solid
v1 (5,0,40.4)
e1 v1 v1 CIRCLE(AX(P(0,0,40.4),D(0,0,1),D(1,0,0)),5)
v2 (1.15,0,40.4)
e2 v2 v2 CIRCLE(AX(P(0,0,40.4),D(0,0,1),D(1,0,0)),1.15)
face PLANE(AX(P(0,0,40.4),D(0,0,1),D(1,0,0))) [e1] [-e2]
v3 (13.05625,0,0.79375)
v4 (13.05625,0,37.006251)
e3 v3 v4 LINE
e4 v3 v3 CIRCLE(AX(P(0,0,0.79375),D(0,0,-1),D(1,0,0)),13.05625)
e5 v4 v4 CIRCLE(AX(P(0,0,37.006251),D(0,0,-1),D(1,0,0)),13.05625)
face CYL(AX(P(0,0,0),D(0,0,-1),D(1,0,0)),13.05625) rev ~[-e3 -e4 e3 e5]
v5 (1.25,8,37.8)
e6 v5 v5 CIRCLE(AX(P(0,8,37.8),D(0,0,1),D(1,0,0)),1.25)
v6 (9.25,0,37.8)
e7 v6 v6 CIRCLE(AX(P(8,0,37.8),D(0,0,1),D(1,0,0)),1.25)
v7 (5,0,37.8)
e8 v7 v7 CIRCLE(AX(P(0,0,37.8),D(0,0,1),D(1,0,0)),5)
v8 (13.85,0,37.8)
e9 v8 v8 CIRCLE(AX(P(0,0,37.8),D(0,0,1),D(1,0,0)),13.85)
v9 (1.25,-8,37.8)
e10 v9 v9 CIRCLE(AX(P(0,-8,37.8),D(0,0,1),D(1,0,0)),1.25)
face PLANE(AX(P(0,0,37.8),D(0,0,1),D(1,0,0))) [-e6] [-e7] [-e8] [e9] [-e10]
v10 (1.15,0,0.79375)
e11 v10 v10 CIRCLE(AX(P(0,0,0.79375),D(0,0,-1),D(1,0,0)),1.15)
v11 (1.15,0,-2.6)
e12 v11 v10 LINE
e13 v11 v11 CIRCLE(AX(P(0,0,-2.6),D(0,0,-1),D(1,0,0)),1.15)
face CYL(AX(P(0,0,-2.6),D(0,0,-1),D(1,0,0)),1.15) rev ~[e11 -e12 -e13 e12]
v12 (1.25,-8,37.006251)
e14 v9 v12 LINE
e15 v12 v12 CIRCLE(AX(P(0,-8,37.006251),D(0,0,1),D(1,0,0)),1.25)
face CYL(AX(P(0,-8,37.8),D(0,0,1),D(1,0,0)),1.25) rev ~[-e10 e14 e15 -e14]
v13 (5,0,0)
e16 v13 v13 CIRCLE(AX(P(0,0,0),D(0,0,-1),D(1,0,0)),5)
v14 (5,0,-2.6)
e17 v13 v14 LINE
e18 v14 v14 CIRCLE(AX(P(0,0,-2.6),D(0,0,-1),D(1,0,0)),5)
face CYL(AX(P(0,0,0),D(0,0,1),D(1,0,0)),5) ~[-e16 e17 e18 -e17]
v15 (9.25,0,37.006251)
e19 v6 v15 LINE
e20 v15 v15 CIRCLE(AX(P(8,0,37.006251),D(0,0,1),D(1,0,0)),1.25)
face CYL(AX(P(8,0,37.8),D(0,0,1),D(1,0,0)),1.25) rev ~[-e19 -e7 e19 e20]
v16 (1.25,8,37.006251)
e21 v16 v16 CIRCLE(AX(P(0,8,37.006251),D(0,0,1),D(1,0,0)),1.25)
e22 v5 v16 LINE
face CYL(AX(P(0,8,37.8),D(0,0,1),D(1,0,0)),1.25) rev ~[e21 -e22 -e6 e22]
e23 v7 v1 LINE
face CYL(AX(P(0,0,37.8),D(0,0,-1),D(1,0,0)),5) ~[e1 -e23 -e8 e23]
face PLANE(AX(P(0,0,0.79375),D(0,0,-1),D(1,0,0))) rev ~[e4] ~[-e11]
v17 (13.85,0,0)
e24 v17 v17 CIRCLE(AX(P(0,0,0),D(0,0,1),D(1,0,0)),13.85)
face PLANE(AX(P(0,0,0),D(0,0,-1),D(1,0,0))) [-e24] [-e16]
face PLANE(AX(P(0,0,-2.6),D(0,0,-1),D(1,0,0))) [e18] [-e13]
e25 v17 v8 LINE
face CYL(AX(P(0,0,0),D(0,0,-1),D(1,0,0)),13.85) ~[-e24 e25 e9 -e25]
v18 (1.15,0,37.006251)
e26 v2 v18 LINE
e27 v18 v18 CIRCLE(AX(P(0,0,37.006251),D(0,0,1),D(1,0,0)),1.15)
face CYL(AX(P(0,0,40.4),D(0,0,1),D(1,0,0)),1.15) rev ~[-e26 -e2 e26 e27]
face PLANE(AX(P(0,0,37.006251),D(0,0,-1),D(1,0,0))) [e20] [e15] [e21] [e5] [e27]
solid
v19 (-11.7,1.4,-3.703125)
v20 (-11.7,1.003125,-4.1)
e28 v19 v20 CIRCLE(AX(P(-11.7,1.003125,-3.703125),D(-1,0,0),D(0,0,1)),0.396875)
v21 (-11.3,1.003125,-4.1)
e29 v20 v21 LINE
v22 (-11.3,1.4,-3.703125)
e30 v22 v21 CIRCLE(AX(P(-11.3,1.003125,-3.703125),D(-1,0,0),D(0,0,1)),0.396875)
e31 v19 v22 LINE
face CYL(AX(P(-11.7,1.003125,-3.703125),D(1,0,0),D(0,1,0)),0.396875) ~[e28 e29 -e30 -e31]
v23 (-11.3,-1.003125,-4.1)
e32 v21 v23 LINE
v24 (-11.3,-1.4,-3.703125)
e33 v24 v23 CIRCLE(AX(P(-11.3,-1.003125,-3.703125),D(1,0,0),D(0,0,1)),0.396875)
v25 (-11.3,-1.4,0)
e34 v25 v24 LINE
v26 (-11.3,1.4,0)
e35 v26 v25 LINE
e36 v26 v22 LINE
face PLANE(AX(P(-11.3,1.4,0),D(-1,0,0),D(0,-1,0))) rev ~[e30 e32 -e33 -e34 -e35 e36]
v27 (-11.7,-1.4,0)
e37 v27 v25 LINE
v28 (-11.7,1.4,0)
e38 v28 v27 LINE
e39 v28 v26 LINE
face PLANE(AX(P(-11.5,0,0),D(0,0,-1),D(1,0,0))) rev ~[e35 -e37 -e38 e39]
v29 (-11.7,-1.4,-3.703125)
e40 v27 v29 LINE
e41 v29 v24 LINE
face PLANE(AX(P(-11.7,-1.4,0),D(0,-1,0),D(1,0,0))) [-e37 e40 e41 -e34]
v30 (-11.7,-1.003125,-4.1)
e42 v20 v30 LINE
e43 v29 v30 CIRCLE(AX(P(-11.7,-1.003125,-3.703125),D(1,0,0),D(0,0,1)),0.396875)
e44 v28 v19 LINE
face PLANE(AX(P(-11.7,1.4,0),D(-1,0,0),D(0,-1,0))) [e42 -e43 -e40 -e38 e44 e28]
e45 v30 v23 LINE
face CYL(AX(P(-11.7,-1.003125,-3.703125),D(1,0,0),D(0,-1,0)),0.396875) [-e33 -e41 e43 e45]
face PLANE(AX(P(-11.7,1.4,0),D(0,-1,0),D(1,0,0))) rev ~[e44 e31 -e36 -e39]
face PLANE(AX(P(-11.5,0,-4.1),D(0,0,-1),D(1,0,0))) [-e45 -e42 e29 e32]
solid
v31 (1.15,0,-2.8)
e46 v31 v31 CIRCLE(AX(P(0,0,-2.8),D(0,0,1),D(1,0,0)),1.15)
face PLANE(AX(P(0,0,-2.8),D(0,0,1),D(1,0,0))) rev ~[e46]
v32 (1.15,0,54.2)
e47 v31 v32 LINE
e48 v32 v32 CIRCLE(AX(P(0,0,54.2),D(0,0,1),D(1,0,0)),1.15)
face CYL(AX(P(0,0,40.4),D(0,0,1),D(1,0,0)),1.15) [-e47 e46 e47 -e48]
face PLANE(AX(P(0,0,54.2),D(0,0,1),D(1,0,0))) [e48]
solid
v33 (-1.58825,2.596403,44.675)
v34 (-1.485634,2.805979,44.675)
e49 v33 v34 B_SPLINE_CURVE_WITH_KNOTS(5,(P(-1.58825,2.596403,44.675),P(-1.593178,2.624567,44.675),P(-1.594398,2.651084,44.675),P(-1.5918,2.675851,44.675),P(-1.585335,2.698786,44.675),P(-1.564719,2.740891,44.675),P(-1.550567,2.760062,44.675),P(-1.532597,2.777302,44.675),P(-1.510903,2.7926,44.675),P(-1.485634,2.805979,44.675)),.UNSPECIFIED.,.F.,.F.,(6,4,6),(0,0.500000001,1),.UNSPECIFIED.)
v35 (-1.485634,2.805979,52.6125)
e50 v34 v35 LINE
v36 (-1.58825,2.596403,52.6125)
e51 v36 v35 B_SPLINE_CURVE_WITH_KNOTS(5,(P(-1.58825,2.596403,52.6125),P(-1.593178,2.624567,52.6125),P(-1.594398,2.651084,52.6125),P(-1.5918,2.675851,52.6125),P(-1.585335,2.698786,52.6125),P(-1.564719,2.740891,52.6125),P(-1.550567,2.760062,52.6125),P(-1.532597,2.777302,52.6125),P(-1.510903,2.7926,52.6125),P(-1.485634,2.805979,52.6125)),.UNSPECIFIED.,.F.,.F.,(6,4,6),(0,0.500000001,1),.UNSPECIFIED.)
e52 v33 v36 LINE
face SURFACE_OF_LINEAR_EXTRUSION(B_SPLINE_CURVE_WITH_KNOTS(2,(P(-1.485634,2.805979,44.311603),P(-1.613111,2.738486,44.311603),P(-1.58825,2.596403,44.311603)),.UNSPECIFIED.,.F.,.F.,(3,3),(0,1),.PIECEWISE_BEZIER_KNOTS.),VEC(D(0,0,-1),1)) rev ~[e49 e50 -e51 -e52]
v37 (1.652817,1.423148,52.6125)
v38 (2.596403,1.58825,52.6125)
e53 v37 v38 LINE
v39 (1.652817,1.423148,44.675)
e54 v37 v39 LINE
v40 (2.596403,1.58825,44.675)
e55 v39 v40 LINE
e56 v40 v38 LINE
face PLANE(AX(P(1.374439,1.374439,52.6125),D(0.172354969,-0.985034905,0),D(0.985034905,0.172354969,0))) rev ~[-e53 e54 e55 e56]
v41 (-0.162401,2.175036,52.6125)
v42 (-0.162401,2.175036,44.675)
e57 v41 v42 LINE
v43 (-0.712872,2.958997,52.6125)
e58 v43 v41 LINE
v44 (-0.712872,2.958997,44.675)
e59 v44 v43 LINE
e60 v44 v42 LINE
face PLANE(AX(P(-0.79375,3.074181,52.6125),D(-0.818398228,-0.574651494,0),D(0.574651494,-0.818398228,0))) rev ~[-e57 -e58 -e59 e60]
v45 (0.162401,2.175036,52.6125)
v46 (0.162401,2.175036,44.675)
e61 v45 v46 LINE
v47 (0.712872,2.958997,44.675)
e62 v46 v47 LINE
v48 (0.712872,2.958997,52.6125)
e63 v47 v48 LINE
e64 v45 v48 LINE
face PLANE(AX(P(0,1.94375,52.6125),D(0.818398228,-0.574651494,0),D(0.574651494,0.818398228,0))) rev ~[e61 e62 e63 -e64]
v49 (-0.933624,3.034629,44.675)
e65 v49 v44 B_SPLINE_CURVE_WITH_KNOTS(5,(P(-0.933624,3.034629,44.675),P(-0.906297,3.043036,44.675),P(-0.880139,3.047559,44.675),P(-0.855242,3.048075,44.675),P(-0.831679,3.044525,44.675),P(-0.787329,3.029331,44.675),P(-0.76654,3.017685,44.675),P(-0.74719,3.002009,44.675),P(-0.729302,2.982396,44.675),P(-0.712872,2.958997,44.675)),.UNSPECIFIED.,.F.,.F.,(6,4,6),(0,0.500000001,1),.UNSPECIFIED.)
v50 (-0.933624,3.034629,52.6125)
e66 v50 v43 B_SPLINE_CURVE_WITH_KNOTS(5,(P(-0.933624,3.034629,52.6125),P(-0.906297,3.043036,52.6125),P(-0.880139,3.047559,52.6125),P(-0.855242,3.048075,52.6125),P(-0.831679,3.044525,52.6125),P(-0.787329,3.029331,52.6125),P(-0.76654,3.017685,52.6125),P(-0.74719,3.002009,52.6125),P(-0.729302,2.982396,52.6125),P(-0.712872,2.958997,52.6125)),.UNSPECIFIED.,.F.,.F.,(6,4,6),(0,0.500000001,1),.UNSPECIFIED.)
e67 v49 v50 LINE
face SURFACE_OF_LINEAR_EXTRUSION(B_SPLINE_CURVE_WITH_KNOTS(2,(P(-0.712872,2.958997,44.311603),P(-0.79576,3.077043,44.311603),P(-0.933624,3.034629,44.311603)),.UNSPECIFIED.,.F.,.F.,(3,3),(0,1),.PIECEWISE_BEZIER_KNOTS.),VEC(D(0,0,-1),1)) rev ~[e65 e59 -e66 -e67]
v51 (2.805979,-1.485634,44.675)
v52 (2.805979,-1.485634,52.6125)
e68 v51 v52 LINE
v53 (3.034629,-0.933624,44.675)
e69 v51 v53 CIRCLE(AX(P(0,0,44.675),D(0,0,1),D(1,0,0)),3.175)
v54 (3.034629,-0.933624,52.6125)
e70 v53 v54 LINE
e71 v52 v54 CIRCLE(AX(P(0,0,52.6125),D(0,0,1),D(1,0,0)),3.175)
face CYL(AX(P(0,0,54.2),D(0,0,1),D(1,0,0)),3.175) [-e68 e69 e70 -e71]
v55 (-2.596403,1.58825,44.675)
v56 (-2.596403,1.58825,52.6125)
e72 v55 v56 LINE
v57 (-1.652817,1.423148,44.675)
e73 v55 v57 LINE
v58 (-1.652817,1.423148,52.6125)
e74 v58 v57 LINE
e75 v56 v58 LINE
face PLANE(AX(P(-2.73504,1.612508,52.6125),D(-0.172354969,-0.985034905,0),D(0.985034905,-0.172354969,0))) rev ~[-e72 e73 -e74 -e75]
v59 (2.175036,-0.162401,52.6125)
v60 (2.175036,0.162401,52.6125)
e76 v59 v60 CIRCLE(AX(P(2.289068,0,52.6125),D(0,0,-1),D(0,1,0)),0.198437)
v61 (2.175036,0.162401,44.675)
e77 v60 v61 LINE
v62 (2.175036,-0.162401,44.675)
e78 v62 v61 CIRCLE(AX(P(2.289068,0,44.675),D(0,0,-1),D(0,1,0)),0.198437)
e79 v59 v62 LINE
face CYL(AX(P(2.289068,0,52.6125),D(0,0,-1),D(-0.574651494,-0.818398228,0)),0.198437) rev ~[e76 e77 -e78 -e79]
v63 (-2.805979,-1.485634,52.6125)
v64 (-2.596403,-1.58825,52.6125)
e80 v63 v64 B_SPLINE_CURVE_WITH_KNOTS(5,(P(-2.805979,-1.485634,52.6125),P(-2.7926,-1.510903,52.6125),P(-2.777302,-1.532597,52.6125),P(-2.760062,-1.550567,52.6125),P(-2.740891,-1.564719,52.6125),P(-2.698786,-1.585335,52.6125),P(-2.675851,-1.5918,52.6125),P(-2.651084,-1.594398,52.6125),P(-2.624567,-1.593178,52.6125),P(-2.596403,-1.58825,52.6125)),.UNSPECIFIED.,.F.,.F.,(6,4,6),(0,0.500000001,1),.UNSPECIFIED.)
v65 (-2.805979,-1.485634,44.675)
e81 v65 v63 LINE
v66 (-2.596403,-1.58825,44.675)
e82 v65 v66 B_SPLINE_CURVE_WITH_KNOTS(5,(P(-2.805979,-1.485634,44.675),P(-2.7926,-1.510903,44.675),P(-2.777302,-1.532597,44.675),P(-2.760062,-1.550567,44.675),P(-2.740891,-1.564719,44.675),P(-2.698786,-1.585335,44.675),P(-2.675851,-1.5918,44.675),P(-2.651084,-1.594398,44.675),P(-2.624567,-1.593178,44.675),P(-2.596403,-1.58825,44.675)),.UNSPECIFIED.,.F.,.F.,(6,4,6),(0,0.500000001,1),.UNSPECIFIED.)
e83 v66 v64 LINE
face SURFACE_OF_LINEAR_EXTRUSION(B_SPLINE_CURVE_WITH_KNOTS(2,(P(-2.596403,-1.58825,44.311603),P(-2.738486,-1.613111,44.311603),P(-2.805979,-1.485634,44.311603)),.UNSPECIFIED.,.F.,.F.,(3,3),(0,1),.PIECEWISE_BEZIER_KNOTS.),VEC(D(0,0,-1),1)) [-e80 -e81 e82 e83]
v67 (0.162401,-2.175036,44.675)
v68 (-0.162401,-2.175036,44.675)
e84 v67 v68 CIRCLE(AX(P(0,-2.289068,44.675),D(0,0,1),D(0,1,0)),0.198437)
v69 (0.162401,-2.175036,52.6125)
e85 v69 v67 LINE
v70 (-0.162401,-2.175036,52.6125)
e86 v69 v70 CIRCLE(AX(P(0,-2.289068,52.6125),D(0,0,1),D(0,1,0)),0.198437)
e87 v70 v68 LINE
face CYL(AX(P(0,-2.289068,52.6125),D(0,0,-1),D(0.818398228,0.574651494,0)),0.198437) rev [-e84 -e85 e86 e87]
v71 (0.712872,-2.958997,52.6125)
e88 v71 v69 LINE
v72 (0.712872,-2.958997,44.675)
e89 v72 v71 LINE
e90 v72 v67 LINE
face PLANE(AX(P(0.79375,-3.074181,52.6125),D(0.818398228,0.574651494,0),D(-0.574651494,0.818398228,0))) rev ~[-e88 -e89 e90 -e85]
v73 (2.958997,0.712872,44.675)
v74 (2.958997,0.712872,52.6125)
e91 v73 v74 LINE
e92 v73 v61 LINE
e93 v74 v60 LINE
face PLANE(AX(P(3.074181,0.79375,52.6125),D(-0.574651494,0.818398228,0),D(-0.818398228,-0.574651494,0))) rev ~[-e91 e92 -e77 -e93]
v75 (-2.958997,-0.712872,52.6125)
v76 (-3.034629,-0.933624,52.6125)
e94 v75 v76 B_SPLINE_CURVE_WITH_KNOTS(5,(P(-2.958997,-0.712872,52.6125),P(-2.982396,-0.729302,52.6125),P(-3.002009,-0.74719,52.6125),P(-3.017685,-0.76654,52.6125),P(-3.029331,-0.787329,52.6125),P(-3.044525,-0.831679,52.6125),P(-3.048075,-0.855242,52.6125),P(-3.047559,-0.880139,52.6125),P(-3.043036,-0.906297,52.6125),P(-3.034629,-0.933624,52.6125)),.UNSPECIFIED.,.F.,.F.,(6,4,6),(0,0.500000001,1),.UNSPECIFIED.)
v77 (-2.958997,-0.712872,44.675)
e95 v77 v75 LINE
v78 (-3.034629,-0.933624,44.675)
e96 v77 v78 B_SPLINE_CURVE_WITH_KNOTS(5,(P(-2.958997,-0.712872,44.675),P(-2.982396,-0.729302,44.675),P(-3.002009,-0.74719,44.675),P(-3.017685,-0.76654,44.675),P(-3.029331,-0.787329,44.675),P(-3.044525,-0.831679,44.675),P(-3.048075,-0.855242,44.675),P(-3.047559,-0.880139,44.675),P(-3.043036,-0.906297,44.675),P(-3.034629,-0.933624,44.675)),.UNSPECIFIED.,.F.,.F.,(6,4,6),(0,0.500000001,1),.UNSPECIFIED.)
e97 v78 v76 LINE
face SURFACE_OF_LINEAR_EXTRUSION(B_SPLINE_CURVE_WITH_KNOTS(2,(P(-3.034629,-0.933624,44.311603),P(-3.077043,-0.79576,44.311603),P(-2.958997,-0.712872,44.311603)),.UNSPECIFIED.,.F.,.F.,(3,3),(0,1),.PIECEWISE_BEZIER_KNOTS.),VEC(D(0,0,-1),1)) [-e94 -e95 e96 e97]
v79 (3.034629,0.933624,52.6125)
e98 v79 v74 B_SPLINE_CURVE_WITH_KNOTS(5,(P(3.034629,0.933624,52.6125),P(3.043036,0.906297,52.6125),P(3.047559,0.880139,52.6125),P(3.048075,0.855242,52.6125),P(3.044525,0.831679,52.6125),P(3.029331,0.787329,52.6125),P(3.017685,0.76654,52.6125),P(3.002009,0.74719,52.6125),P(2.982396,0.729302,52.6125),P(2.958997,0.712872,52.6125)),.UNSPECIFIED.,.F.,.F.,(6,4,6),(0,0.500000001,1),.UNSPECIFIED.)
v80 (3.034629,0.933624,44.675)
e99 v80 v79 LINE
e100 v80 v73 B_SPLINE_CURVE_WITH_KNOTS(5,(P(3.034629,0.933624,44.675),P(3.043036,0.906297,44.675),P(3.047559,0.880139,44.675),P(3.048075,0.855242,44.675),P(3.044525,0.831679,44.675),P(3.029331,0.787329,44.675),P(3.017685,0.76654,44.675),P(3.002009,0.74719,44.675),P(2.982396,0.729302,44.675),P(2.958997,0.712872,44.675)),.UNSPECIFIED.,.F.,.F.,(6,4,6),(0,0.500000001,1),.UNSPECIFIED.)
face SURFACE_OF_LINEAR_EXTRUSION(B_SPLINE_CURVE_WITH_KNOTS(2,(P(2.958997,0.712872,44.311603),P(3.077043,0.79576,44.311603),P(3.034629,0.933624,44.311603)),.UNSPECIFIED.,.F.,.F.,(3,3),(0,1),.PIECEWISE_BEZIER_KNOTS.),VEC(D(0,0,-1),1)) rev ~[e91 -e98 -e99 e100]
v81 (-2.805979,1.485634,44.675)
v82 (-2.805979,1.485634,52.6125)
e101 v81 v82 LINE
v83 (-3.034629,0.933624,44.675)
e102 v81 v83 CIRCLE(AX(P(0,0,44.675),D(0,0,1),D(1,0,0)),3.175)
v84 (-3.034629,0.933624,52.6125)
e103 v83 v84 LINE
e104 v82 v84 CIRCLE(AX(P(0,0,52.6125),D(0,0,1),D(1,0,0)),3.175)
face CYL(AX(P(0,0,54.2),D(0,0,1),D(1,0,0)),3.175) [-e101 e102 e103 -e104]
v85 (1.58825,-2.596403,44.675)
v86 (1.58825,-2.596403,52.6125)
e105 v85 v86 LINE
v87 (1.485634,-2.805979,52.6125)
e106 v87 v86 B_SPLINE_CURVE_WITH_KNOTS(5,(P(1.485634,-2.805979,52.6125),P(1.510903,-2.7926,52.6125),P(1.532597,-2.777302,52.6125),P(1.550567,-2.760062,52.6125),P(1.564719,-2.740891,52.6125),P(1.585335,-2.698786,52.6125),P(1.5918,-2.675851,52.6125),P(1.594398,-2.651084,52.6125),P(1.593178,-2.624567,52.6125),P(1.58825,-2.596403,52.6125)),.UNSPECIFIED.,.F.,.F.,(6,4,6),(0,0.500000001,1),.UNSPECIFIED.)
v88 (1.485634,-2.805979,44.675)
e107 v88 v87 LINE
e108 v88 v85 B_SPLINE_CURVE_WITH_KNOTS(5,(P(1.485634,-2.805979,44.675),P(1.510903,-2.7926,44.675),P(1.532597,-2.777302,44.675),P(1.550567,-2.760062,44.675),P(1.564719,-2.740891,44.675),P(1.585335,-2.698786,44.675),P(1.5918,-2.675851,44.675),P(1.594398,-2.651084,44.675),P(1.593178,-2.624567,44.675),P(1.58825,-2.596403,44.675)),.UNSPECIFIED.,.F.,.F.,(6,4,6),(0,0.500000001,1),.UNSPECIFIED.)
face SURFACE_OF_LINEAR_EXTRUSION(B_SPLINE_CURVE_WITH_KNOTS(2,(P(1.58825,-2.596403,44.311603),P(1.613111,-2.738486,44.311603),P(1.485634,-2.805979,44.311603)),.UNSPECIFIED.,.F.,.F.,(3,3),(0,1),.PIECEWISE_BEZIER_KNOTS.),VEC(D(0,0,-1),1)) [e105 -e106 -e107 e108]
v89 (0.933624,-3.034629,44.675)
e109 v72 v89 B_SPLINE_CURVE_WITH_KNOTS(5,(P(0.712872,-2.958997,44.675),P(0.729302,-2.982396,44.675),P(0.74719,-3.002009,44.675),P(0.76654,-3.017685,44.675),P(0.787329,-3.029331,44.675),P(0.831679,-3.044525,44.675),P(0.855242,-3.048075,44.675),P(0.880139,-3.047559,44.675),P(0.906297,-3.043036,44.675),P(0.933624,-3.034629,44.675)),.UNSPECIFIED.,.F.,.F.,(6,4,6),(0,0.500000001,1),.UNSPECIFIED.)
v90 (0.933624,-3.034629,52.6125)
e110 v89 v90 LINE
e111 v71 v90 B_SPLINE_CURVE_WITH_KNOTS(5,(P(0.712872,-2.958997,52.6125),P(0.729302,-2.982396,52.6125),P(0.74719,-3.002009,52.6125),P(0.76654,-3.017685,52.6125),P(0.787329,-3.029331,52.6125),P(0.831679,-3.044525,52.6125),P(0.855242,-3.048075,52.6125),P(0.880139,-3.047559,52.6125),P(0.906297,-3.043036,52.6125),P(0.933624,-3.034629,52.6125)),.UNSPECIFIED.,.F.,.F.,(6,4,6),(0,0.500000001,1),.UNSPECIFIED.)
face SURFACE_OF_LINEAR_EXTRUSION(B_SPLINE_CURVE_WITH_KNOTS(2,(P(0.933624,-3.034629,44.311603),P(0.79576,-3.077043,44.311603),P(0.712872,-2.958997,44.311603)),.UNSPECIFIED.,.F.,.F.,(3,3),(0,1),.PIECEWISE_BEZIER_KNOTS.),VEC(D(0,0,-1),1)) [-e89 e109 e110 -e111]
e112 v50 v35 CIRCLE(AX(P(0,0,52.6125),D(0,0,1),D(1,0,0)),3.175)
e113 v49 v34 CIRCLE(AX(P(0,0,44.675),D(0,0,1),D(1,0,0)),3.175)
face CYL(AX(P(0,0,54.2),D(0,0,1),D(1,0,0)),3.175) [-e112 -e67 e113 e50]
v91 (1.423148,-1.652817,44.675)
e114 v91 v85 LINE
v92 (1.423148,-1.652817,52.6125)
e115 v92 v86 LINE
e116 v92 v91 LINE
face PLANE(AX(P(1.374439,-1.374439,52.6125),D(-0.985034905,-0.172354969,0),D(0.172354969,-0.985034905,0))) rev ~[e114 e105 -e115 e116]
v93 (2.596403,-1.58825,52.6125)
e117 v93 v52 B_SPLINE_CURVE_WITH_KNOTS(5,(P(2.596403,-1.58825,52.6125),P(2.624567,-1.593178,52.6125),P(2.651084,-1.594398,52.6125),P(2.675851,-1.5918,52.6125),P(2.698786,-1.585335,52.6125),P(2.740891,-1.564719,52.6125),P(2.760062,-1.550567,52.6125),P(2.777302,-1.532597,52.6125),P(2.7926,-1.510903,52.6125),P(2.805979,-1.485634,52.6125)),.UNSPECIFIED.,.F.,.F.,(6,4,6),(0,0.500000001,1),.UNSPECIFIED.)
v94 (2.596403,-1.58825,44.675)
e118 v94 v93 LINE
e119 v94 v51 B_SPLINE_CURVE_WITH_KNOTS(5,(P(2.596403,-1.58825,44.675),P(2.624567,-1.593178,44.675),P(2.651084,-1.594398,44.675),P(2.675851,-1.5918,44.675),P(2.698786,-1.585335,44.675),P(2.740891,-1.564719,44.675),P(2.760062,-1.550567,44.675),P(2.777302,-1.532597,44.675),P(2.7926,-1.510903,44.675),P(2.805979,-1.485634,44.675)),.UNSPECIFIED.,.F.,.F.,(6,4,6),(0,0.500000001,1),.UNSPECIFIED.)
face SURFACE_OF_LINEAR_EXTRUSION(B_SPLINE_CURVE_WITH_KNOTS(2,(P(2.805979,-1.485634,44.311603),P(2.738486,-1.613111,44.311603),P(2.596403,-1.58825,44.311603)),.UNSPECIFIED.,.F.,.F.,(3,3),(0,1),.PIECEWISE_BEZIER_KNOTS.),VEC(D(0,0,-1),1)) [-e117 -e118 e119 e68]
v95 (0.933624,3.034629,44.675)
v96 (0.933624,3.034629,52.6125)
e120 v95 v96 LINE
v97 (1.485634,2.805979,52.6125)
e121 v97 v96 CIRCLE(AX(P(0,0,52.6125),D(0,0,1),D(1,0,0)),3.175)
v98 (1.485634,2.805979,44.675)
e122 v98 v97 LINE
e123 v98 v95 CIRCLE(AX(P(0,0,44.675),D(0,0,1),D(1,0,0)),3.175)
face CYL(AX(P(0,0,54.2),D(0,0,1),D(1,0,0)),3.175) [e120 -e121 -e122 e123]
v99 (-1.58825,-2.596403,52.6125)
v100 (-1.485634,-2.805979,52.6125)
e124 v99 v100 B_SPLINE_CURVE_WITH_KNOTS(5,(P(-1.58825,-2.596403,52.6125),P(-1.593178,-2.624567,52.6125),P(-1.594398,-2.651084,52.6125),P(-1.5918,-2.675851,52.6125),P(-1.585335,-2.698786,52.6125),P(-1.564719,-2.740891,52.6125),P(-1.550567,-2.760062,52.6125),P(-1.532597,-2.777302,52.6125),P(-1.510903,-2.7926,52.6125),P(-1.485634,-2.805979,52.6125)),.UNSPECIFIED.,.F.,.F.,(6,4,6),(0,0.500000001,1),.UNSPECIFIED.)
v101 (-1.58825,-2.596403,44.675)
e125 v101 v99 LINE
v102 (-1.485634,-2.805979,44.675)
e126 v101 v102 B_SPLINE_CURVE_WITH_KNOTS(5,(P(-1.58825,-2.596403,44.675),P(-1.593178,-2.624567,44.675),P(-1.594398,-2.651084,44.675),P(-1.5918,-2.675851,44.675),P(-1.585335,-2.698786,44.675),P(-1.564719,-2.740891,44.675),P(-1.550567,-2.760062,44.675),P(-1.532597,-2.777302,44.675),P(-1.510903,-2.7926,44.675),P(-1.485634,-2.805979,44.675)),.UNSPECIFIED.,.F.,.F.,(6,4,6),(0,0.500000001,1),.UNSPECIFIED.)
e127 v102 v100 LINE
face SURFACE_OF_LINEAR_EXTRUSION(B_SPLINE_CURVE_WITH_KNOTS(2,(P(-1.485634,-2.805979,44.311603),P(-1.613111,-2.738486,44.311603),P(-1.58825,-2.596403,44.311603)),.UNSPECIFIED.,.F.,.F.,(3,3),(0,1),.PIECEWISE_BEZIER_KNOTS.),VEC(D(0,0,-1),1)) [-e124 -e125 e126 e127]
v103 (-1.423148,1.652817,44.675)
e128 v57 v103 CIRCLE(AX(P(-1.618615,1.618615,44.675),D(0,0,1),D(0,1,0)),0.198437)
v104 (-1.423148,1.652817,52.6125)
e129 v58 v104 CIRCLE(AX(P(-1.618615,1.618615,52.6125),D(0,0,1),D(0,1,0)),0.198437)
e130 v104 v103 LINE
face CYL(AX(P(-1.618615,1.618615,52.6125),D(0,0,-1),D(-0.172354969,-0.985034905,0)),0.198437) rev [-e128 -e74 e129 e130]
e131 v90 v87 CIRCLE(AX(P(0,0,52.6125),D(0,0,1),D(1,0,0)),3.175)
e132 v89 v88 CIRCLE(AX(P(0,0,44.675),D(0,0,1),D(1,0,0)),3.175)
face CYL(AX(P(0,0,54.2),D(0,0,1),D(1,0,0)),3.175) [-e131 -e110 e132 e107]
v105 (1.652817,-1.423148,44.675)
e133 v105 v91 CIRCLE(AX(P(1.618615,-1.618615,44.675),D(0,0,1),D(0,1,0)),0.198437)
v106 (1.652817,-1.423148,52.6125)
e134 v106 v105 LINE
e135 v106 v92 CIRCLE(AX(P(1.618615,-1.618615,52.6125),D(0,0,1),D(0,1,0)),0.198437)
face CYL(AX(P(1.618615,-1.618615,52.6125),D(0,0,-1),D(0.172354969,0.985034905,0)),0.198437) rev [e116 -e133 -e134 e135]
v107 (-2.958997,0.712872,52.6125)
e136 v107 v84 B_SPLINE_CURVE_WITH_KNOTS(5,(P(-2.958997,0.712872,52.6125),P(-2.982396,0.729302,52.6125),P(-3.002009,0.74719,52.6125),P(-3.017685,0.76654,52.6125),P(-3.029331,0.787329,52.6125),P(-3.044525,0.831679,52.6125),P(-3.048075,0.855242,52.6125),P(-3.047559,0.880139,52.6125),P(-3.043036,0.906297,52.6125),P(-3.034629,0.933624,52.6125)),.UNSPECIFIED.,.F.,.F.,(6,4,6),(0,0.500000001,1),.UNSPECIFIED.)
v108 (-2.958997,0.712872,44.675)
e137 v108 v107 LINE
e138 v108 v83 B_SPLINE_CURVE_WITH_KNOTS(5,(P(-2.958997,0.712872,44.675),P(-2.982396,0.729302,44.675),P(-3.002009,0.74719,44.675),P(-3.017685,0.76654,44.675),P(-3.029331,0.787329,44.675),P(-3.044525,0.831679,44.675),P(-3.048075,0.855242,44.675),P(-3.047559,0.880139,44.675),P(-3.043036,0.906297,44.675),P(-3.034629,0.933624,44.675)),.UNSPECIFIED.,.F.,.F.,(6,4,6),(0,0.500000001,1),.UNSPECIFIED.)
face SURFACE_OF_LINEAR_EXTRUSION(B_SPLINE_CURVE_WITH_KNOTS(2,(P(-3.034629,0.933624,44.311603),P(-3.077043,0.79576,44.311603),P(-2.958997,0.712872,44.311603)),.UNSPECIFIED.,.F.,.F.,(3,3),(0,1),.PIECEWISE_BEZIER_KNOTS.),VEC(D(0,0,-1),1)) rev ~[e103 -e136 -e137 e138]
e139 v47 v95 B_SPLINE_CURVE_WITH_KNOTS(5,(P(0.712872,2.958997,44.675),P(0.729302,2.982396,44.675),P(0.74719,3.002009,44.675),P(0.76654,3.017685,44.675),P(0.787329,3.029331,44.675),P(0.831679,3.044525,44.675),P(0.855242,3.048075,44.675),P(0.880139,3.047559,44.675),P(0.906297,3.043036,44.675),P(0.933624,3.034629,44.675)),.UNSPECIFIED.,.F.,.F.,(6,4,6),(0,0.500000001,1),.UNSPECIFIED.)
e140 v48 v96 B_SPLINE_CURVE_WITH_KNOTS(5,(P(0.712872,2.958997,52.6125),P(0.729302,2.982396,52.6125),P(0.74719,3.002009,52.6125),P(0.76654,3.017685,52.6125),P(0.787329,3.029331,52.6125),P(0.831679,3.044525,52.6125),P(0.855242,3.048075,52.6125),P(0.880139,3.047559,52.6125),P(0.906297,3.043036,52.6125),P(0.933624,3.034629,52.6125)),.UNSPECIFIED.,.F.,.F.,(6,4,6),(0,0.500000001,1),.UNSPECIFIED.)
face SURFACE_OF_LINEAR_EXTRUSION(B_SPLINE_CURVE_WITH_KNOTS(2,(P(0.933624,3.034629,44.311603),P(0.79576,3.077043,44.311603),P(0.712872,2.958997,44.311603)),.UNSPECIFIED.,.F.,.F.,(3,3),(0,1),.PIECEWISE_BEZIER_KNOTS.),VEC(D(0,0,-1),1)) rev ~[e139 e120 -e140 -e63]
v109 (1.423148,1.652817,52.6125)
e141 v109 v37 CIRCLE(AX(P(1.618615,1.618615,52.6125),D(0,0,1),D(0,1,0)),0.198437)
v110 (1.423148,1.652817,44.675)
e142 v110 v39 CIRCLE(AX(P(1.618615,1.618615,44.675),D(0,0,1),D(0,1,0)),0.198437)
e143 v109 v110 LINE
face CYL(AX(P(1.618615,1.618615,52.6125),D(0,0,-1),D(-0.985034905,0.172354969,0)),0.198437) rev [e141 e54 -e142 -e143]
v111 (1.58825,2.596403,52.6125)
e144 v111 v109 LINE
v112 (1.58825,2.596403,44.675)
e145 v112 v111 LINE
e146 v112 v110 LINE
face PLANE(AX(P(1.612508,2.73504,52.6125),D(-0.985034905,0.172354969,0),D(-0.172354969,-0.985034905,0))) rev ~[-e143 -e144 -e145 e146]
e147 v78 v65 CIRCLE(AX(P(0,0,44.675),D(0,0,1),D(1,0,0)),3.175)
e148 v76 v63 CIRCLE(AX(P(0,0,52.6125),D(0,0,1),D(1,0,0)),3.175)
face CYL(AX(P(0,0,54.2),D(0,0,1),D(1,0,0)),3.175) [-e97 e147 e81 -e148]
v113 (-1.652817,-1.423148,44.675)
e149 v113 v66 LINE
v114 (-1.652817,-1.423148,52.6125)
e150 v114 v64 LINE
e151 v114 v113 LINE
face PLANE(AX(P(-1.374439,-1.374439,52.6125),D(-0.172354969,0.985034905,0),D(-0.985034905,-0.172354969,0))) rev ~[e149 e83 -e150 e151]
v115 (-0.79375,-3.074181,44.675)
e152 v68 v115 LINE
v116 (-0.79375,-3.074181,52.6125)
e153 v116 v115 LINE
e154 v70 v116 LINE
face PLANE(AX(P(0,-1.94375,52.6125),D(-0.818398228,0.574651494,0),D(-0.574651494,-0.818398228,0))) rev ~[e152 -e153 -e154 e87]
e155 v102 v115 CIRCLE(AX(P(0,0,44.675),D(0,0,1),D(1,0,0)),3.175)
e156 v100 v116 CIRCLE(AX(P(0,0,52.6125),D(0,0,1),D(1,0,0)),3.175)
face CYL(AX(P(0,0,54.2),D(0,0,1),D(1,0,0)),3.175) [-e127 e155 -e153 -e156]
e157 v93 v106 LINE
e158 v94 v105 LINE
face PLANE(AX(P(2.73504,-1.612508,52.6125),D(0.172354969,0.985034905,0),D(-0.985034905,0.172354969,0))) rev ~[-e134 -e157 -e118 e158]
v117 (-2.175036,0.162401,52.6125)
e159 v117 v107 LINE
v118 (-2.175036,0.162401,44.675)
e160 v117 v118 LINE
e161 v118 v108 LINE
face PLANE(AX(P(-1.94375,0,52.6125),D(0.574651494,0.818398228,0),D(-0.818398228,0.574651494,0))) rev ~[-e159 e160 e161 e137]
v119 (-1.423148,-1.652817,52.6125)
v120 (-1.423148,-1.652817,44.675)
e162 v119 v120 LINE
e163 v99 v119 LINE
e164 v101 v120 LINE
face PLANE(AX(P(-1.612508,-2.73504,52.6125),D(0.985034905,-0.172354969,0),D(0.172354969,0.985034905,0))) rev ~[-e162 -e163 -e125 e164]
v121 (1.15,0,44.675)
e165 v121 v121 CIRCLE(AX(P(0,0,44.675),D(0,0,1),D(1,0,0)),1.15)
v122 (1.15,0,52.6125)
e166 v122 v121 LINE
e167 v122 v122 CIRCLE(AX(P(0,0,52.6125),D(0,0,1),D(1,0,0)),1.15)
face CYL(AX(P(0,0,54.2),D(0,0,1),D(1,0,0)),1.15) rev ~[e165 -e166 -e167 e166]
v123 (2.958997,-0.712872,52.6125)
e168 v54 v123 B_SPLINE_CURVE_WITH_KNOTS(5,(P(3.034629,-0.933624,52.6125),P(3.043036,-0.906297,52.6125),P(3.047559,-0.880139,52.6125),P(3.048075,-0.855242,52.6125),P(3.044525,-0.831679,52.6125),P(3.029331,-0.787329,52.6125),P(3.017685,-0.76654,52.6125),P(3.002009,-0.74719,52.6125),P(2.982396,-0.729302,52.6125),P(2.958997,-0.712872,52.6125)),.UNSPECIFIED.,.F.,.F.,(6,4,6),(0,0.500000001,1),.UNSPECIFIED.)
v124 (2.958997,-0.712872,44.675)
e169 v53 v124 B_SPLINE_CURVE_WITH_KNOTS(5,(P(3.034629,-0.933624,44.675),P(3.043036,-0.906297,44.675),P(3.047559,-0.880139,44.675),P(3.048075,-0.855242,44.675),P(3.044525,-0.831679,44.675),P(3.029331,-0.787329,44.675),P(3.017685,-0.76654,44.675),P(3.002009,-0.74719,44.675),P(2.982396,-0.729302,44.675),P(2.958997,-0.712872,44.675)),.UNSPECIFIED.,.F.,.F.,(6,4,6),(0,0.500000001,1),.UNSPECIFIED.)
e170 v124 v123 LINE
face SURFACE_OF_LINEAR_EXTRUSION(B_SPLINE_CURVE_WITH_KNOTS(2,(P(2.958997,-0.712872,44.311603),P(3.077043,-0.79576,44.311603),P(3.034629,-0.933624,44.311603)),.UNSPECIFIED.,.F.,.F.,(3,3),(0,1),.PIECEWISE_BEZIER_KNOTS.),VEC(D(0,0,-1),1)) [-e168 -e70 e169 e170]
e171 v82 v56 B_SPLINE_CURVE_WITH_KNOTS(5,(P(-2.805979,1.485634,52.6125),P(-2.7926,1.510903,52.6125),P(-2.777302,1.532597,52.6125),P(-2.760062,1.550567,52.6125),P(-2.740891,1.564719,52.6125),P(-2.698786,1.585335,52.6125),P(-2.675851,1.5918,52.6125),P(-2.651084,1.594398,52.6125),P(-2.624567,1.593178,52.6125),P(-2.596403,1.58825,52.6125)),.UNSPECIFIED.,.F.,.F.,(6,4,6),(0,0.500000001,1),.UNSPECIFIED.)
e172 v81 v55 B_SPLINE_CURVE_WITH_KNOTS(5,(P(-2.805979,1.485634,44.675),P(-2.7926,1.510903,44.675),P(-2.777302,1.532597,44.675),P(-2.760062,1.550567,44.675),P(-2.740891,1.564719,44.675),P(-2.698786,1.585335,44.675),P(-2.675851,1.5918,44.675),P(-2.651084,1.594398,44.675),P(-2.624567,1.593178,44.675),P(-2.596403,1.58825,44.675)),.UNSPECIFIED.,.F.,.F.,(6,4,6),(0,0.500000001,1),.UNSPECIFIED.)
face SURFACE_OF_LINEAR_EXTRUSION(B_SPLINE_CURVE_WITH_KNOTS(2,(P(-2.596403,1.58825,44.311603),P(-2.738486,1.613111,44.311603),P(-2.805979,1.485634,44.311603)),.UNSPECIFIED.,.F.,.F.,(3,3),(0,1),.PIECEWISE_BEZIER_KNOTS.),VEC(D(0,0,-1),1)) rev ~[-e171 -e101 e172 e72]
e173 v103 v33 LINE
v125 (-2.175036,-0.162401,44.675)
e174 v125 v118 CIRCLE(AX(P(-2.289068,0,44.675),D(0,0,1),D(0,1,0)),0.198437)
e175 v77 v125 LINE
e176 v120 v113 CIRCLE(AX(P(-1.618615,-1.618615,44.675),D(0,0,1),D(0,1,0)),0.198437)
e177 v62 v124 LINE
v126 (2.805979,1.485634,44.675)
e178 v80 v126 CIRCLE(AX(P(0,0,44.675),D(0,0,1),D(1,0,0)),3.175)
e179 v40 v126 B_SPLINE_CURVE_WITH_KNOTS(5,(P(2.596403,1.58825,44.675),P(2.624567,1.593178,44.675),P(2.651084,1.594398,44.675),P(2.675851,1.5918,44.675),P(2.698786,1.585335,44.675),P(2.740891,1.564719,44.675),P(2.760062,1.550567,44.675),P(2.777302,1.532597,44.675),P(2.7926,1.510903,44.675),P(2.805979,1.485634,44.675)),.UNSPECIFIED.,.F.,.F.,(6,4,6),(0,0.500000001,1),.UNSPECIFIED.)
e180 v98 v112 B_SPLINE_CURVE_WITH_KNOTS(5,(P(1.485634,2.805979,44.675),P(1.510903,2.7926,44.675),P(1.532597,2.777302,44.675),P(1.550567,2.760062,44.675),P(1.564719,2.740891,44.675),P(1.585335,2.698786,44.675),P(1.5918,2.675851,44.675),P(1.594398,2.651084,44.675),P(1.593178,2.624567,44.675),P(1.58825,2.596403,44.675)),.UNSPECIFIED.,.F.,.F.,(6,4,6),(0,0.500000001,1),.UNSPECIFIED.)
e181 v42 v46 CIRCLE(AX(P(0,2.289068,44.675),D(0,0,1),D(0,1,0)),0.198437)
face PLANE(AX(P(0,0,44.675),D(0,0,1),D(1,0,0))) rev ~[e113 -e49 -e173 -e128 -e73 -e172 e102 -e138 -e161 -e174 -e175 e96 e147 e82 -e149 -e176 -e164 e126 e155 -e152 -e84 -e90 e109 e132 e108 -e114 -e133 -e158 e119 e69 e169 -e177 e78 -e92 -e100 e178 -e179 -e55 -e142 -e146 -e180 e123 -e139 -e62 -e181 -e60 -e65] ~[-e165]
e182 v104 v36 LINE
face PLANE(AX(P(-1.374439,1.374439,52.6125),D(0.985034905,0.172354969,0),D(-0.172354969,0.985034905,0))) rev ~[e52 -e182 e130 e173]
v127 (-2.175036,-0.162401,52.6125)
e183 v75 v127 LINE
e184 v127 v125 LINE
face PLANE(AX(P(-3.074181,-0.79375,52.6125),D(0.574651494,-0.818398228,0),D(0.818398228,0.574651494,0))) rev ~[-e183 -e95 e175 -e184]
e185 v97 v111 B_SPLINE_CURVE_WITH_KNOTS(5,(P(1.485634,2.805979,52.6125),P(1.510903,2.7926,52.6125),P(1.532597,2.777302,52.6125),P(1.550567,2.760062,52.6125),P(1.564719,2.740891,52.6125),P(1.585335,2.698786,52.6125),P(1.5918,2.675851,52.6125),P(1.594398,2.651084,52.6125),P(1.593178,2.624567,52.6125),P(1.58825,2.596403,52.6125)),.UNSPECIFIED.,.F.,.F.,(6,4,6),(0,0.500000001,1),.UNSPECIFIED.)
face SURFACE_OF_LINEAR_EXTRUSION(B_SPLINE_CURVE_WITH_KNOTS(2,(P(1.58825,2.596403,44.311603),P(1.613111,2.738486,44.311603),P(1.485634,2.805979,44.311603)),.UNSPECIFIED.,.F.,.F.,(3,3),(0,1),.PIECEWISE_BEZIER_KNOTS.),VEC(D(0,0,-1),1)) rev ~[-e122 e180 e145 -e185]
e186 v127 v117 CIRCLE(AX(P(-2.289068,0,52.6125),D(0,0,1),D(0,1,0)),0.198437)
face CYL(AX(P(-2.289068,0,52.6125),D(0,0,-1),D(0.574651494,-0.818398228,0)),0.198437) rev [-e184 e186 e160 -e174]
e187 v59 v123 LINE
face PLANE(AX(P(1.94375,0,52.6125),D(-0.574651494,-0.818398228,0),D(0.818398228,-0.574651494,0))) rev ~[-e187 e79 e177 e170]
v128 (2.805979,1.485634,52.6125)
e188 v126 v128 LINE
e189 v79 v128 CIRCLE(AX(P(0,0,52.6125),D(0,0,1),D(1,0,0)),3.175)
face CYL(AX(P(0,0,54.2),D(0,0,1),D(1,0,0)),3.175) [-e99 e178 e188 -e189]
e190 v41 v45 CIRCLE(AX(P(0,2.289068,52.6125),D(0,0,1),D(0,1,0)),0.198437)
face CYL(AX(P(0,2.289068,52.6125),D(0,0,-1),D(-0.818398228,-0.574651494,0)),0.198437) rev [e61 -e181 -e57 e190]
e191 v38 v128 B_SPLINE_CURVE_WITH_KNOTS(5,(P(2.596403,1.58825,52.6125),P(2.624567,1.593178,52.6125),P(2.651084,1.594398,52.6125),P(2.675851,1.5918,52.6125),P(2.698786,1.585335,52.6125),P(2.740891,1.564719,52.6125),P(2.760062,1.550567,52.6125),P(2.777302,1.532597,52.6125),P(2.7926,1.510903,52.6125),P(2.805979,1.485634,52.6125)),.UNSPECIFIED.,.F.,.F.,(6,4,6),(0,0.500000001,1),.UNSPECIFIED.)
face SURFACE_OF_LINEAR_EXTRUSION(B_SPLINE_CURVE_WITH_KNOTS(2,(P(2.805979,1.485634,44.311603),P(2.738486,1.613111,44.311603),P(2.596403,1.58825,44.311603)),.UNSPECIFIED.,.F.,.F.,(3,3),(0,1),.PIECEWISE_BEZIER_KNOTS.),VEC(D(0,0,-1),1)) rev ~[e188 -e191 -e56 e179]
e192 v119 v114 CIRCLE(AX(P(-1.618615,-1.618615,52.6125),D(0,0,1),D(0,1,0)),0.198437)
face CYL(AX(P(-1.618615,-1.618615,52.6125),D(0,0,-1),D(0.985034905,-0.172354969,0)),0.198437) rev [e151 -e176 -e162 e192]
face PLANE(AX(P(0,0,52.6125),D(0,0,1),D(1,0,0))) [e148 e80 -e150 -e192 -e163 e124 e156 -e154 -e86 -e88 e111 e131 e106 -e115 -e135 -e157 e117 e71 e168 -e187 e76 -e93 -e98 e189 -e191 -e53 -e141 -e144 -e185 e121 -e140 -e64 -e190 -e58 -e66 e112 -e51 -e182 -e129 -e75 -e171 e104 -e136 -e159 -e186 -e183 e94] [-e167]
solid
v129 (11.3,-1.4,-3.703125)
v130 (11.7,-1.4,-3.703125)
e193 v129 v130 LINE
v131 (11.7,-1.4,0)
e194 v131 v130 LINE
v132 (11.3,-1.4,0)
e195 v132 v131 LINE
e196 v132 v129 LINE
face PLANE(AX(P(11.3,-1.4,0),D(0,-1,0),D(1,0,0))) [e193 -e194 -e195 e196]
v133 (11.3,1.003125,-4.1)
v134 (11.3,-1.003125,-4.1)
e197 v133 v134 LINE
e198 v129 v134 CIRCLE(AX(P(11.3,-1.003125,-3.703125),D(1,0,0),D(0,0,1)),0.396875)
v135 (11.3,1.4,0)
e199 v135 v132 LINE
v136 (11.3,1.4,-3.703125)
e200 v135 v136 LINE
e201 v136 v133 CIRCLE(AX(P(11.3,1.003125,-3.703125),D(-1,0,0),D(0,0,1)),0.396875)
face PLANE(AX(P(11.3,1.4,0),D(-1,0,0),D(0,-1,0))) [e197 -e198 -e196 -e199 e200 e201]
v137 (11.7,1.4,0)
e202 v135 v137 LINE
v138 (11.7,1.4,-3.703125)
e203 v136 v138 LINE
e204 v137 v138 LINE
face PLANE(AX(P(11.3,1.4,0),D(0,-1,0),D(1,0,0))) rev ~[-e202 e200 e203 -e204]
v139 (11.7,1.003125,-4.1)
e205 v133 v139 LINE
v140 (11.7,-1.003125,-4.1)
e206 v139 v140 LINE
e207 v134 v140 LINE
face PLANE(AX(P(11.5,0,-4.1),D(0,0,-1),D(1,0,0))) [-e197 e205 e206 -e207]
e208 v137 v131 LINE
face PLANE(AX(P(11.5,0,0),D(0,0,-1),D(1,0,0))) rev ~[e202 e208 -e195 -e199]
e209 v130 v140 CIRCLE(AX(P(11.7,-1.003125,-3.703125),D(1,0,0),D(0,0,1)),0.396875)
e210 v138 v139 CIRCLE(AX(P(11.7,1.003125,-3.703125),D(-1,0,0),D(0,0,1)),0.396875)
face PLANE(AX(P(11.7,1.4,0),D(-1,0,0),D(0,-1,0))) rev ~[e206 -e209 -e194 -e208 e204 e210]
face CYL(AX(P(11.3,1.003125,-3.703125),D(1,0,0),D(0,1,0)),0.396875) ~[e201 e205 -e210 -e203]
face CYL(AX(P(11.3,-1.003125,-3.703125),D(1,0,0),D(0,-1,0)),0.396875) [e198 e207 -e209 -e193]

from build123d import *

# Parameters (mm, degrees)
F0_R         = 13.85
F1_DEPTH     = 37.8
F2_R         = 5
F3_DEPTH     = 2.6
F4_R         = 1.25
F5_DEPTH     = 0.79375
F6_R         = 13.05625
F7_DEPTH     = 37.0062506
F8_R         = 1.15
F9_DEPTH     = 50.8
F11_R        = 13.05625
F12_DEPTH    = 0.79375
F13_R        = 5
F14_DEPTH    = 2.6
F15_R        = 1.15
F16_DEPTH    = 25.4
F10_R        = 1.15
F17_DEPTH    = 13.8
F18_DEPTH    = 43.2
F19_W        = 0.4
F19_H        = 2.8
F20_DEPTH    = 4.1
F21_R        = 0.396875
F21_2_R      = 0.396875
F22_R        = 3.175
F22_R_2      = 1.15
F23_DEPTH    = 9.525
F24_DEPTH    = 1.5875
F26_DEPTH    = 25.4
F27_R        = 0.1984375
F28_T1_DEPTH = 8.6642936454


# Not quite as in the source:
# - a fillet or chamfer that OpenCascade refuses, or shapes differently, is made with other operations: its cross-section is extruded or revolved along the edge and cut away or added


with BuildPart() as f1:
    # F0 (on Top) → F1 (new body)
    with BuildSketch(Plane.XY):
        Circle(F0_R)
    extrude(amount=F1_DEPTH)

    # F2 (on face) → F3 (join)
    with BuildSketch(Plane.XY.offset(37.8)):
        Circle(F2_R)
    extrude(amount=F3_DEPTH)

    # F4 (on face) → F5 (cut)
    with BuildSketch(Plane.XY.offset(37.8)):
        with Locations((0, 8)):
            Circle(F4_R)
        with Locations((8, 0)):
            Circle(F4_R)
        with Locations((0, -8)):
            Circle(F4_R)
    extrude(amount=-F5_DEPTH, mode=Mode.SUBTRACT)

    # F6 (on face) → F7 (cut)
    with BuildSketch(Plane(origin=(0, 0, 0), x_dir=(1, 0, 0), z_dir=(0, 0, -1))):
        Circle(F6_R)
    extrude(amount=-F7_DEPTH, mode=Mode.SUBTRACT)

    # F8 (on face) → F9 (cut)
    with BuildSketch(Plane.XY.offset(40.4)):
        Circle(F8_R)
    extrude(amount=-F9_DEPTH, mode=Mode.SUBTRACT)

    # F11 (on face) → F12 (join)
    with BuildSketch(Plane(origin=(0, 0, 0), x_dir=(1, 0, 0), z_dir=(0, 0, -1))):
        Circle(F11_R)
    extrude(amount=-F12_DEPTH)

    # F13 (on face) → F14 (join)
    with BuildSketch(Plane(origin=(0, 0, 0), x_dir=(1, 0, 0), z_dir=(0, 0, -1))):
        Circle(F13_R)
    extrude(amount=F14_DEPTH)

    # F15 (on face) → F16 (cut)
    with BuildSketch(Plane(origin=(0, 0, -2.6), x_dir=(1, 0, 0), z_dir=(0, 0, -1))):
        Circle(F15_R)
    extrude(amount=-F16_DEPTH, mode=Mode.SUBTRACT)


with BuildPart() as f17:
    # F10 (on face) → F17 (new body)
    with BuildSketch(Plane.XY.offset(40.4)):
        Circle(F10_R)
    extrude(amount=F17_DEPTH)

    # F18 (add): a face of the model
    f18_faces = [f17.faces().sort_by_distance(p)[0] for p in [
        (0, 0, 40.4),
    ]]
    extrude(f18_faces, amount=F18_DEPTH)


with BuildPart() as f20:
    # F19 (on face) → F20 (new body)
    with BuildSketch(Plane(origin=(0, 0, 0), x_dir=(1, 0, 0), z_dir=(0, 0, -1))):
        with Locations((-11.5, 0)):
            Rectangle(F19_W, F19_H)
    extrude(amount=F20_DEPTH)

    # F21
    f21_edges = [f20.edges().sort_by_distance(p)[0] for p in [
        (-11.5, 1.4, -4.1),
        (-11.5, -1.4, -4.1),
    ]]
    fillet(f21_edges, radius=F21_R)


with BuildPart() as f20b:
    # F19 (on face) → F20, piece 2 (new body)
    with BuildSketch(Plane(origin=(0, 0, 0), x_dir=(1, 0, 0), z_dir=(0, 0, -1))):
        with Locations((11.5, 0)):
            Rectangle(F19_W, F19_H)
    extrude(amount=F20_DEPTH)

    # F21#2
    f21_2_edges = [f20b.edges().sort_by_distance(p)[0] for p in [
        (11.5, -1.4, -4.1),
        (11.5, 1.4, -4.1),
    ]]
    fillet(f21_2_edges, radius=F21_2_R)


with BuildPart() as f23:
    # F22 (on face) → F23 (new body)
    with BuildSketch(Plane.XY.offset(54.2)):
        Circle(F22_R)
        Circle(F22_R_2, mode=Mode.SUBTRACT)
    extrude(amount=-F23_DEPTH)

    # F24 (cut): a face of the model
    f24_faces = [f23.faces().sort_by_distance(p)[0] for p in [
        (-3.0851974388, 0, 54.2),
    ]]
    extrude(f24_faces, amount=-F24_DEPTH, mode=Mode.SUBTRACT)

    # F25 (on face) → F26 (cut)
    with BuildSketch(Plane.XY.offset(52.6125)):
        with BuildLine():
            ThreePointArc((-1.6125078925, 2.7350399077), (-2.2450640303, 2.2450640303), (-2.7350399077, 1.6125078925))
            Line((-2.7350399077, 1.6125078925), (-1.3744388059, 1.3744388059))
            Line((-1.3744388059, 1.3744388059), (-1.6125078925, 2.7350399077))
        make_face()
        with BuildLine():
            ThreePointArc((0.79375, 3.0741805311), (0, 3.175), (-0.79375, 3.0741805311))
            Line((-0.79375, 3.0741805311), (0, 1.94375))
            Line((0, 1.94375), (0.79375, 3.0741805311))
        make_face()
        with BuildLine():
            ThreePointArc((2.7350399077, 1.6125078925), (2.2450640303, 2.2450640303), (1.6125078925, 2.7350399077))
            Line((1.6125078925, 2.7350399077), (1.3744388059, 1.3744388059))
            Line((1.3744388059, 1.3744388059), (2.7350399077, 1.6125078925))
        make_face()
        with BuildLine():
            ThreePointArc((3.175, 0), (3.1496942856, 0.4000636286), (3.0741805311, 0.79375))
            Line((3.0741805311, 0.79375), (1.94375, 0))
            Line((1.94375, 0), (3.0741805311, -0.79375))
            ThreePointArc((3.0741805311, -0.79375), (3.1496942856, -0.4000636286), (3.175, 0))
        make_face()
        with BuildLine():
            Line((1.3744388059, -1.3744388059), (1.6125078925, -2.7350399077))
            ThreePointArc((1.6125078925, -2.7350399077), (2.2450640303, -2.2450640303), (2.7350399077, -1.6125078925))
            Line((2.7350399077, -1.6125078925), (1.3744388059, -1.3744388059))
        make_face()
        with BuildLine():
            Line((0, -1.94375), (-0.79375, -3.0741805311))
            ThreePointArc((-0.79375, -3.0741805311), (0, -3.175), (0.79375, -3.0741805311))
            Line((0.79375, -3.0741805311), (0, -1.94375))
        make_face()
        with BuildLine():
            Line((-1.3744388059, -1.3744388059), (-2.7350399077, -1.6125078925))
            ThreePointArc((-2.7350399077, -1.6125078925), (-2.2450640303, -2.2450640303), (-1.6125078925, -2.7350399077))
            Line((-1.6125078925, -2.7350399077), (-1.3744388059, -1.3744388059))
        make_face()
        with BuildLine():
            Line((-3.0741805311, -0.79375), (-1.94375, 0))
            Line((-1.94375, 0), (-3.0741805311, 0.79375))
            ThreePointArc((-3.0741805311, 0.79375), (-3.175, 0), (-3.0741805311, -0.79375))
        make_face()
    extrude(amount=-F26_DEPTH, mode=Mode.SUBTRACT)

    # F27
    f27_edges = [f23.edges().sort_by_distance(p)[0] for p in [
        (-1.374439, 1.374439, 48.64375),
        (0, 1.94375, 48.64375),
        (1.374439, 1.374439, 48.64375),
        (1.94375, 0, 48.64375),
        (1.374439, -1.374439, 48.64375),
        (0, -1.94375, 48.64375),
        (-1.374439, -1.374439, 48.64375),
        (-1.94375, 0, 48.64375),
    ]]
    fillet(f27_edges, radius=F27_R)

    # F28: fillet of radius 0.1984375 on 15 edges, made by hand

    # F28_s2 → F28_t1 (cut)
    with BuildSketch(Plane.XY.offset(44.3116031773)):
        with BuildLine():
            add(Edge.make_bspline(
                [(-3.034628604, 0.9336242477), (-3.0770434151, 0.7957602201), (-2.9589967221, 0.7128718338)],
                knots=[0, 0, 0, 1, 1, 1], degree=2, weights=[1, 1, 1]))
            Line((-2.9589967221, 0.7128718338), (-3.0741805311, 0.79375))
            ThreePointArc((-3.0741805311, 0.79375), (-3.0552051426, 0.8639135007), (-3.034628604, 0.9336242477))
        make_face()
        with BuildLine():
            add(Edge.make_bspline(
                [(-3.034628604, -0.9336242477), (-3.0770434151, -0.7957602201), (-2.9589967221, -0.7128718338)],
                knots=[0, 0, 0, 1, 1, 1], degree=2, weights=[1, 1, 1]))
            Line((-2.9589967221, -0.7128718338), (-3.0741805311, -0.79375))
            ThreePointArc((-3.0741805311, -0.79375), (-3.0552051426, -0.8639135007), (-3.034628604, -0.9336242477))
        make_face()
        with BuildLine():
            add(Edge.make_bspline(
                [(-2.5964031555, -1.5882501399), (-2.7384857127, -1.613110817), (-2.8059785009, -1.4856344276)],
                knots=[0, 0, 0, 1, 1, 1], degree=2, weights=[1, 1, 1]))
            ThreePointArc((-2.8059785009, -1.4856344276), (-2.7712353689, -1.5494771795), (-2.7350399077, -1.6125078925))
            Line((-2.7350399077, -1.6125078925), (-2.5964031555, -1.5882501399))
        make_face()
        with BuildLine():
            add(Edge.make_bspline(
                [(-2.5964031555, 1.5882501399), (-2.7384857127, 1.613110817), (-2.8059785009, 1.4856344276)],
                knots=[0, 0, 0, 1, 1, 1], degree=2, weights=[1, 1, 1]))
            ThreePointArc((-2.8059785009, 1.4856344276), (-2.7712353689, 1.5494771795), (-2.7350399077, 1.6125078925))
            Line((-2.7350399077, 1.6125078925), (-2.5964031555, 1.5882501399))
        make_face()
        with BuildLine():
            add(Edge.make_bspline(
                [(-1.4856344276, 2.8059785009), (-1.613110817, 2.7384857127), (-1.5882501399, 2.5964031555)],
                knots=[0, 0, 0, 1, 1, 1], degree=2, weights=[1, 1, 1]))
            Line((-1.5882501399, 2.5964031555), (-1.6125078925, 2.7350399077))
            ThreePointArc((-1.6125078925, 2.7350399077), (-1.5494771795, 2.7712353689), (-1.4856344276, 2.8059785009))
        make_face()
        with BuildLine():
            add(Edge.make_bspline(
                [(-0.7128718338, 2.9589967221), (-0.7957602201, 3.0770434151), (-0.9336242477, 3.034628604)],
                knots=[0, 0, 0, 1, 1, 1], degree=2, weights=[1, 1, 1]))
            ThreePointArc((-0.9336242477, 3.034628604), (-0.8639135007, 3.0552051426), (-0.79375, 3.0741805311))
            Line((-0.79375, 3.0741805311), (-0.7128718338, 2.9589967221))
        make_face()
        with BuildLine():
            add(Edge.make_bspline(
                [(0.9336242477, 3.034628604), (0.7957602201, 3.0770434151), (0.7128718338, 2.9589967221)],
                knots=[0, 0, 0, 1, 1, 1], degree=2, weights=[1, 1, 1]))
            Line((0.7128718338, 2.9589967221), (0.79375, 3.0741805311))
            ThreePointArc((0.79375, 3.0741805311), (0.8639135007, 3.0552051426), (0.9336242477, 3.034628604))
        make_face()
        with BuildLine():
            add(Edge.make_bspline(
                [(1.5882501399, 2.5964031555), (1.613110817, 2.7384857127), (1.4856344276, 2.8059785009)],
                knots=[0, 0, 0, 1, 1, 1], degree=2, weights=[1, 1, 1]))
            ThreePointArc((1.4856344276, 2.8059785009), (1.5494771795, 2.7712353689), (1.6125078925, 2.7350399077))
            Line((1.6125078925, 2.7350399077), (1.5882501399, 2.5964031555))
        make_face()
        with BuildLine():
            add(Edge.make_bspline(
                [(2.8059785009, 1.4856344276), (2.7384857127, 1.613110817), (2.5964031555, 1.5882501399)],
                knots=[0, 0, 0, 1, 1, 1], degree=2, weights=[1, 1, 1]))
            Line((2.5964031555, 1.5882501399), (2.7350399077, 1.6125078925))
            ThreePointArc((2.7350399077, 1.6125078925), (2.7712353689, 1.5494771795), (2.8059785009, 1.4856344276))
        make_face()
        with BuildLine():
            add(Edge.make_bspline(
                [(2.9589967221, 0.7128718338), (3.0770434151, 0.7957602201), (3.034628604, 0.9336242477)],
                knots=[0, 0, 0, 1, 1, 1], degree=2, weights=[1, 1, 1]))
            ThreePointArc((3.034628604, 0.9336242477), (3.0552051426, 0.8639135007), (3.0741805311, 0.79375))
            Line((3.0741805311, 0.79375), (2.9589967221, 0.7128718338))
        make_face()
        with BuildLine():
            add(Edge.make_bspline(
                [(2.9589967221, -0.7128718338), (3.0770434151, -0.7957602201), (3.034628604, -0.9336242477)],
                knots=[0, 0, 0, 1, 1, 1], degree=2, weights=[1, 1, 1]))
            ThreePointArc((3.034628604, -0.9336242477), (3.0552051426, -0.8639135007), (3.0741805311, -0.79375))
            Line((3.0741805311, -0.79375), (2.9589967221, -0.7128718338))
        make_face()
        with BuildLine():
            add(Edge.make_bspline(
                [(2.8059785009, -1.4856344276), (2.7384857127, -1.613110817), (2.5964031555, -1.5882501399)],
                knots=[0, 0, 0, 1, 1, 1], degree=2, weights=[1, 1, 1]))
            Line((2.5964031555, -1.5882501399), (2.7350399077, -1.6125078925))
            ThreePointArc((2.7350399077, -1.6125078925), (2.7712353689, -1.5494771795), (2.8059785009, -1.4856344276))
        make_face()
        with BuildLine():
            add(Edge.make_bspline(
                [(1.5882501399, -2.5964031555), (1.613110817, -2.7384857127), (1.4856344276, -2.8059785009)],
                knots=[0, 0, 0, 1, 1, 1], degree=2, weights=[1, 1, 1]))
            ThreePointArc((1.4856344276, -2.8059785009), (1.5494771795, -2.7712353689), (1.6125078925, -2.7350399077))
            Line((1.6125078925, -2.7350399077), (1.5882501399, -2.5964031555))
        make_face()
        with BuildLine():
            add(Edge.make_bspline(
                [(0.9336242477, -3.034628604), (0.7957602201, -3.0770434151), (0.7128718338, -2.9589967221)],
                knots=[0, 0, 0, 1, 1, 1], degree=2, weights=[1, 1, 1]))
            Line((0.7128718338, -2.9589967221), (0.79375, -3.0741805311))
            ThreePointArc((0.79375, -3.0741805311), (0.8639135007, -3.0552051426), (0.9336242477, -3.034628604))
        make_face()
        with BuildLine():
            add(Edge.make_bspline(
                [(-1.4856344276, -2.8059785009), (-1.613110817, -2.7384857127), (-1.5882501399, -2.5964031555)],
                knots=[0, 0, 0, 1, 1, 1], degree=2, weights=[1, 1, 1]))
            Line((-1.5882501399, -2.5964031555), (-1.6125078925, -2.7350399077))
            ThreePointArc((-1.6125078925, -2.7350399077), (-1.5494771795, -2.7712353689), (-1.4856344276, -2.8059785009))
        make_face()
    extrude(amount=F28_T1_DEPTH, mode=Mode.SUBTRACT)


solid = Compound([f1.part, f17.part, f20.part, f20b.part, f23.part])
